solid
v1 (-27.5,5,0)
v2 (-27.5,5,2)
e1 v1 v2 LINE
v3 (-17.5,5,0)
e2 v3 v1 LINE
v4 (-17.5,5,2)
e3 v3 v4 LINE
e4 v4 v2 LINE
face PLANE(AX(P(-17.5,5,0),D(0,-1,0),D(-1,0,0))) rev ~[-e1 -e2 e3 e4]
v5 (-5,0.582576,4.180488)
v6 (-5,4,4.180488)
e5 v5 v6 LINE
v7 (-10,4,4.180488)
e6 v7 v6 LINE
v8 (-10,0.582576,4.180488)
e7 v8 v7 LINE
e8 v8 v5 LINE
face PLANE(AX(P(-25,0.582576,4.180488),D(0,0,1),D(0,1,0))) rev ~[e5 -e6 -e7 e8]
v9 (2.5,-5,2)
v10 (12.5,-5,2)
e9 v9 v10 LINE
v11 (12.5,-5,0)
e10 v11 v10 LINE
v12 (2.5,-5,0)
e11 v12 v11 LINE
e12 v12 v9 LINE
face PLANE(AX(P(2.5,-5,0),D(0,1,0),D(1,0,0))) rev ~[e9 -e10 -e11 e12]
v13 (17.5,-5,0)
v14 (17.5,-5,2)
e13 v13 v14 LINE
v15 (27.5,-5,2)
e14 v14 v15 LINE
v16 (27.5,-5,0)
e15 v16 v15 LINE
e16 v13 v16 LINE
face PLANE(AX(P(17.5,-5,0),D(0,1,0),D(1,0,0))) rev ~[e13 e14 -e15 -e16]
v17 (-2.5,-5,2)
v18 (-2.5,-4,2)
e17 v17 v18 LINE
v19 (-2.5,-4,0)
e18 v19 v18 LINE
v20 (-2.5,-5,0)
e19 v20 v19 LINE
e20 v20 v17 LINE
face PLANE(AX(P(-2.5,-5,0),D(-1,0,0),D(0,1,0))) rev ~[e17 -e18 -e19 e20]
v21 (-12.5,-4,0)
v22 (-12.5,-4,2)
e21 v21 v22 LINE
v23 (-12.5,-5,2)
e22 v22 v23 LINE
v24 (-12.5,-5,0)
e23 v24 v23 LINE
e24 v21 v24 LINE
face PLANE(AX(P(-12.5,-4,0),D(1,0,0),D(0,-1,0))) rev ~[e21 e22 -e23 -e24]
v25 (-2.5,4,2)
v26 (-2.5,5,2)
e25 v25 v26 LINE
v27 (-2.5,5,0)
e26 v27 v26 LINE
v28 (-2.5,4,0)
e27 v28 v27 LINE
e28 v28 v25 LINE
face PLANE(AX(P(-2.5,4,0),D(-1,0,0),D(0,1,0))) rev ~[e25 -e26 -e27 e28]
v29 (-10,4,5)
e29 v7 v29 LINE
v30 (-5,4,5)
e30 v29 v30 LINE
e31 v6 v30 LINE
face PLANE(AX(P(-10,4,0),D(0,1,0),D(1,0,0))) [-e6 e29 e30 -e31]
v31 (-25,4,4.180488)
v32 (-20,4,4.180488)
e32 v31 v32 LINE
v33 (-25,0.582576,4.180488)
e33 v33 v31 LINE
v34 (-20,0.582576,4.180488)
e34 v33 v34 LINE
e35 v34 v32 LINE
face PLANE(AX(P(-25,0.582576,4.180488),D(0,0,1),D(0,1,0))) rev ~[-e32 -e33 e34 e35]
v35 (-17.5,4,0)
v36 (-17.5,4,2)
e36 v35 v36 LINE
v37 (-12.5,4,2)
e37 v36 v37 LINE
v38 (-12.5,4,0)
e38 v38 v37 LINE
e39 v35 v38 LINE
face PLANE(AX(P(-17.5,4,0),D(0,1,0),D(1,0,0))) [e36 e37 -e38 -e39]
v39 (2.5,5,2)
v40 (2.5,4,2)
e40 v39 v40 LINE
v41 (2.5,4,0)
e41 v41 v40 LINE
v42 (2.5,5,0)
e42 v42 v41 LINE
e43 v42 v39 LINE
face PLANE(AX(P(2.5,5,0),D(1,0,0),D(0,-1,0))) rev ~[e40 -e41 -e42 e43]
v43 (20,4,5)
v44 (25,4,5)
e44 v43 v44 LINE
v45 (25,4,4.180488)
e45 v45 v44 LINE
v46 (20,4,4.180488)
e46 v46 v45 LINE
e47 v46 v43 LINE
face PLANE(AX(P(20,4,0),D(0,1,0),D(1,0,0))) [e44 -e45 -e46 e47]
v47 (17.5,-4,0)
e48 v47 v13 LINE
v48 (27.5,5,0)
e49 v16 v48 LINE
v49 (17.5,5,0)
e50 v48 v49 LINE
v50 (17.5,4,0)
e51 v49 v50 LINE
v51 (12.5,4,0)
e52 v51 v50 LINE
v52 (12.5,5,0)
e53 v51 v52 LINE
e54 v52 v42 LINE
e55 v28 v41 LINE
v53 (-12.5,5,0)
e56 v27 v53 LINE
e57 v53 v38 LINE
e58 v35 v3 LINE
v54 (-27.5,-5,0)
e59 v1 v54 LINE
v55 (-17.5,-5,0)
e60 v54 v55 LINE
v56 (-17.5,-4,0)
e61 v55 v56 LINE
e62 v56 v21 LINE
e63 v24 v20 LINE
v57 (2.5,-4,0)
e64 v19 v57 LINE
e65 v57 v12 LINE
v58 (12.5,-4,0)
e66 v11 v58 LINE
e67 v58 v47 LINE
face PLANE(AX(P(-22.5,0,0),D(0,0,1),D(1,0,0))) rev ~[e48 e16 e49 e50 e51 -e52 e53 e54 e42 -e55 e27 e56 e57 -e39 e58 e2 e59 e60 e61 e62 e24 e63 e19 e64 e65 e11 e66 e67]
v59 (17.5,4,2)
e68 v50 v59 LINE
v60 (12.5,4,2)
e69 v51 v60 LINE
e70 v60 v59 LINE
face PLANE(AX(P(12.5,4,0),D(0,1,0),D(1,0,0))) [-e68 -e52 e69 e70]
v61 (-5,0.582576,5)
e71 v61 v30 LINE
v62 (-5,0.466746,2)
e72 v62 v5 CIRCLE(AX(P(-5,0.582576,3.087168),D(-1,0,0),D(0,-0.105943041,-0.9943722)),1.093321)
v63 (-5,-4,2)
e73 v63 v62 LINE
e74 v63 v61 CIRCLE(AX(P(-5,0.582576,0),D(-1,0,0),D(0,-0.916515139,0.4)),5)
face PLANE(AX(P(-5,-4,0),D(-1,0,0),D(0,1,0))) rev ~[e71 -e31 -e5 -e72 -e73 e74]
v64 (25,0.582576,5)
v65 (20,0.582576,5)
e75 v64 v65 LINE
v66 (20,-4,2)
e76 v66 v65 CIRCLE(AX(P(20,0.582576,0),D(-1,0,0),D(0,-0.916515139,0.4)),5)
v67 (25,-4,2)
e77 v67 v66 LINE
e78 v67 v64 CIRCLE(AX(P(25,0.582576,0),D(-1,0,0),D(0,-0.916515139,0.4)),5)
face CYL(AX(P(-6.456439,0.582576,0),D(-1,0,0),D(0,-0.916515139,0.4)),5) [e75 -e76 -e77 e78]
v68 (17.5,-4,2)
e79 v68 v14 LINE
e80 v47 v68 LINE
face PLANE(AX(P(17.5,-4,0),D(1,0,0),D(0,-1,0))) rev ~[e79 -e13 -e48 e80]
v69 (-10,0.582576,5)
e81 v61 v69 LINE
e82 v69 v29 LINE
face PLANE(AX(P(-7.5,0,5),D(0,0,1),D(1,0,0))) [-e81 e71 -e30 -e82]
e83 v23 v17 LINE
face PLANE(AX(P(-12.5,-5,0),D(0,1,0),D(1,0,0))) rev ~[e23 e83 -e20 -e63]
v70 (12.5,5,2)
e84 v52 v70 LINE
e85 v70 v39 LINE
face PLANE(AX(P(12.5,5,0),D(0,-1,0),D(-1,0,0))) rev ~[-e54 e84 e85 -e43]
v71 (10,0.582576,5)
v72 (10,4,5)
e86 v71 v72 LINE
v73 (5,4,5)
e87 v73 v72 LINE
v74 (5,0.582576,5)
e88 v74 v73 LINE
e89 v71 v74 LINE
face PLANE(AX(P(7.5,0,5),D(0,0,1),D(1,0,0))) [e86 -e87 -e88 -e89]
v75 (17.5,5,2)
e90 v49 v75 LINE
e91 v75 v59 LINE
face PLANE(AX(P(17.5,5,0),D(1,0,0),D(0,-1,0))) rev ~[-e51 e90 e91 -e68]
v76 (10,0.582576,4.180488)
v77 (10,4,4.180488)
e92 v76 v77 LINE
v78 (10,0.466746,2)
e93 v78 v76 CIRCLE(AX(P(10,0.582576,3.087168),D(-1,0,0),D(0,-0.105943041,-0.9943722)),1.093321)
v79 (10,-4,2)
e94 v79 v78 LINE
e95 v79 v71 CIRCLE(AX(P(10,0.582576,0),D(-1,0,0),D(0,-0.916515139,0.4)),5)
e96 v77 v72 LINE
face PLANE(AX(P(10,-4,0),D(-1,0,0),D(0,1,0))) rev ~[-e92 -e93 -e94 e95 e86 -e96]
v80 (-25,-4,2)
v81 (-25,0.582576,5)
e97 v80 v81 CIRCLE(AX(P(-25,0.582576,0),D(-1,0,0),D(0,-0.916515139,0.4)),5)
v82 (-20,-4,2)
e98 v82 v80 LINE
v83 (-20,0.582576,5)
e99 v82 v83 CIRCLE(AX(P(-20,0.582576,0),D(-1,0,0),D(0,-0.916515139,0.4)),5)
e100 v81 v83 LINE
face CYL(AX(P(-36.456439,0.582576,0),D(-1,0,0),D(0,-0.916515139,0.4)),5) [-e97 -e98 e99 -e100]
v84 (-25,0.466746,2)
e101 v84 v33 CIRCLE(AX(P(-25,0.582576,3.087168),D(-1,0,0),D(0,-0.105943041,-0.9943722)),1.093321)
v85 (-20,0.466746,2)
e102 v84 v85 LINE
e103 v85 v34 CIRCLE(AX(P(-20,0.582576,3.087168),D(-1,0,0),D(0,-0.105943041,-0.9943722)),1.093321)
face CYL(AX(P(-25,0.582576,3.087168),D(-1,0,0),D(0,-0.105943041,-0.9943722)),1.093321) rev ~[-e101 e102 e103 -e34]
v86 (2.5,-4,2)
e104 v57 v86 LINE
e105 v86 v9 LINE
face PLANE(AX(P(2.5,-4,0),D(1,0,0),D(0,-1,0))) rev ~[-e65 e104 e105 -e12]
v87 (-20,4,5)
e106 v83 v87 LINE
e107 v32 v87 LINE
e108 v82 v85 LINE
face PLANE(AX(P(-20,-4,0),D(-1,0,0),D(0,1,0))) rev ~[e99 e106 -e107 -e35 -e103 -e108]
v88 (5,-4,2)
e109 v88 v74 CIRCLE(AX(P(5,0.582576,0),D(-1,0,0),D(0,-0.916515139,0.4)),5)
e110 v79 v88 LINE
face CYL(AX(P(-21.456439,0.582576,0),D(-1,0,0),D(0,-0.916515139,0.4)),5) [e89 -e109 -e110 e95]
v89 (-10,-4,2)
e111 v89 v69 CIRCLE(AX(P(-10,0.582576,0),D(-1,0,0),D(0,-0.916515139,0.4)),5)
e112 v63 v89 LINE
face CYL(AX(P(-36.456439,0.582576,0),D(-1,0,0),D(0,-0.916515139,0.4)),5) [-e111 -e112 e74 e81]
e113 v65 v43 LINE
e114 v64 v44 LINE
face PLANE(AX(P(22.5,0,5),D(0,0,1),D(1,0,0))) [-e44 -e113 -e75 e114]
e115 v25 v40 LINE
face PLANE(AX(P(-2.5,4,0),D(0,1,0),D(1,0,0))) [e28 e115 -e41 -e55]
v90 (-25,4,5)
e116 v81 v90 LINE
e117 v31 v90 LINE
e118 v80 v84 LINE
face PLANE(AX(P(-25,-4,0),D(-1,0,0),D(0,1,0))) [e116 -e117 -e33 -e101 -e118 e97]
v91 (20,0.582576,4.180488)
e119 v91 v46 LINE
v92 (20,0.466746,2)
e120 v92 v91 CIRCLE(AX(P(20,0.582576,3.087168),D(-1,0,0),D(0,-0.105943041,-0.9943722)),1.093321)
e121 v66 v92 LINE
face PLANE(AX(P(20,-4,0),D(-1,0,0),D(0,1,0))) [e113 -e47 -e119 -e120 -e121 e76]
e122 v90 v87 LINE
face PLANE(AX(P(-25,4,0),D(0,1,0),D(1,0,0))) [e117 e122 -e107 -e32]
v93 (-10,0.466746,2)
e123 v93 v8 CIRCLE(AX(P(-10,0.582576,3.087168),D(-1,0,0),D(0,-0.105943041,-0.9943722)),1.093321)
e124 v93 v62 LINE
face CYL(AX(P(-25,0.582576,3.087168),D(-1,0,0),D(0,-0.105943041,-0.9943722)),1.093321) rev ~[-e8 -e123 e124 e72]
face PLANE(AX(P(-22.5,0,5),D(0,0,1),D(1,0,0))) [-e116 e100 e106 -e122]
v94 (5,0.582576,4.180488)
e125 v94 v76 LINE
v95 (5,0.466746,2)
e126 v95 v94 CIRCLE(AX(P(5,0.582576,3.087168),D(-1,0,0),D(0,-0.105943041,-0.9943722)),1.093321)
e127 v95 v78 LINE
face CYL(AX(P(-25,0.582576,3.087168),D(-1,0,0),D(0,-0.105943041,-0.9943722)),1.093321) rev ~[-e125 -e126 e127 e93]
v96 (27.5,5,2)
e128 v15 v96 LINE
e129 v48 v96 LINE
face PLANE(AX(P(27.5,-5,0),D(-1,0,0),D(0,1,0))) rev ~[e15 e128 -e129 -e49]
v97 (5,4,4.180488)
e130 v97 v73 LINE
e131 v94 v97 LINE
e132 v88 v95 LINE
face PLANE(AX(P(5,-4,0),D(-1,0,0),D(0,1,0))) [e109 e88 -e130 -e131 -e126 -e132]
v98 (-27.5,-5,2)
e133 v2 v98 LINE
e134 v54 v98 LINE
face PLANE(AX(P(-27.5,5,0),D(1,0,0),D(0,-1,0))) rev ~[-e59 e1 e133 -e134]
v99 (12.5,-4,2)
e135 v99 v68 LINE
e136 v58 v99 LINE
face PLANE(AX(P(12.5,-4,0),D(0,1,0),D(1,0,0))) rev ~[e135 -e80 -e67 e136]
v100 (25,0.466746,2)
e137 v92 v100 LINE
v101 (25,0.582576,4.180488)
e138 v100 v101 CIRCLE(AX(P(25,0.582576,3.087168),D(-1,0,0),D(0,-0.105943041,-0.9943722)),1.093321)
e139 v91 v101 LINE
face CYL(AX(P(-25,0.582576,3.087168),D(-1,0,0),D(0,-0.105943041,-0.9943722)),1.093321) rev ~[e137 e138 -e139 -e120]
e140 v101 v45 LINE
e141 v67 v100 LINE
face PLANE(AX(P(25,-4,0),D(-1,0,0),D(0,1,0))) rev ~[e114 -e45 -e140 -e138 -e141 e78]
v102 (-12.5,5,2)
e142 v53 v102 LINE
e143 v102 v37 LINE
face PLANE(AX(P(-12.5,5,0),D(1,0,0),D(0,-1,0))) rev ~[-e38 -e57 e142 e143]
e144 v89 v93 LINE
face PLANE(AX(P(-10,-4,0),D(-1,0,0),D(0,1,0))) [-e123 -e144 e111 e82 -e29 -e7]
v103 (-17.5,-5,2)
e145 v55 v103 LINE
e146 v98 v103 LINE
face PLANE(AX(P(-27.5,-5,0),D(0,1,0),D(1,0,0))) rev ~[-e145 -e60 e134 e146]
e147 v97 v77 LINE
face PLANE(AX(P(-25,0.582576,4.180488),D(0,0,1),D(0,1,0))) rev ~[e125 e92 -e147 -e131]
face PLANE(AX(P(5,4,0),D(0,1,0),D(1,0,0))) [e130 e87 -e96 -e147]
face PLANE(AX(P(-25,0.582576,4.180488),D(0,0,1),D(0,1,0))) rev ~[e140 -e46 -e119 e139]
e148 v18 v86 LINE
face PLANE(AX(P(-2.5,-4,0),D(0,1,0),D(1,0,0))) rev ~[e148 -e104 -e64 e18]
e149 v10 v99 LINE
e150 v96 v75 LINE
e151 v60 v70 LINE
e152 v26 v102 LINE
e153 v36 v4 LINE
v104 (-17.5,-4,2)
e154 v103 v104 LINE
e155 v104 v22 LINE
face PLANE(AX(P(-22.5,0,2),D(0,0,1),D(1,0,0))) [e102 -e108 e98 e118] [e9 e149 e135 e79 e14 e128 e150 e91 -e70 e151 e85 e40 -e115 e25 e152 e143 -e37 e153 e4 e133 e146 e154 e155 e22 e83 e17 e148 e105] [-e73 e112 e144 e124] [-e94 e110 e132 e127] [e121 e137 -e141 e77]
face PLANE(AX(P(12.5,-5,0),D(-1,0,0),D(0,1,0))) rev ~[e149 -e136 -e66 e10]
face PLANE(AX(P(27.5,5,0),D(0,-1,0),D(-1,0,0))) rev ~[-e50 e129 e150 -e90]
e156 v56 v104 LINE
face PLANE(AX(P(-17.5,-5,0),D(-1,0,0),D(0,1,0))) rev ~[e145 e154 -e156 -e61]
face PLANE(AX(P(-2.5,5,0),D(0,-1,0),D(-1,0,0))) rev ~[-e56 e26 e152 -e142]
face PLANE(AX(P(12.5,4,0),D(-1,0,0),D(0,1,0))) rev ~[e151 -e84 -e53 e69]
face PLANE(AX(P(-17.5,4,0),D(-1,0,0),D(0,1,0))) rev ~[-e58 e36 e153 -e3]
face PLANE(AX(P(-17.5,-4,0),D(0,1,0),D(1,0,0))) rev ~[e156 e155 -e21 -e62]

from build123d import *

# Parameters (mm, degrees)
F0_W        = 5
F0_H        = 8
F1_DEPTH    = 2
F2_DEPTH    = 5
F3_T1_DEPTH = 27.9128784748
F3_T3_DEPTH = 27.9128784748
F3_T5_DEPTH = 27.9128784748
F3_T7_DEPTH = 27.9128784748
F5_DEPTH    = 65


# Not quite as in the source:
# - a fillet or chamfer that OpenCascade refuses, or shapes differently, is made with other operations: its cross-section is extruded or revolved along the edge and cut away or added


with BuildPart() as f1:
    # F0 (on Top) → F1 (new body)
    with BuildSketch(Plane.XY):
        Polygon((-17.5, 5), (-27.5, 5), (-27.5, -5), (-17.5, -5), (-17.5, -4), (-17.5, 4), align=None)
        with Locations((-22.5, 0)):
            Rectangle(F0_W, F0_H, mode=Mode.SUBTRACT)
        with Locations((-15, 0)):
            Rectangle(F0_W, F0_H)
        Polygon((-12.5, 5), (-12.5, 4), (-12.5, -4), (-12.5, -5), (-2.5, -5), (-2.5, -4), (-2.5, 4), (-2.5, 5), align=None)
        with Locations((-7.5, 0)):
            Rectangle(F0_W, F0_H, mode=Mode.SUBTRACT)
        Rectangle(F0_W, F0_H)
        Polygon((2.5, 5), (2.5, 4), (2.5, -4), (2.5, -5), (12.5, -5), (12.5, -4), (12.5, 4), (12.5, 5), align=None)
        with Locations((7.5, 0)):
            Rectangle(F0_W, F0_H, mode=Mode.SUBTRACT)
        with Locations((15, 0)):
            Rectangle(F0_W, F0_H)
        Polygon((17.5, 5), (17.5, 4), (17.5, -4), (17.5, -5), (27.5, -5), (27.5, 5), align=None)
        with Locations((22.5, 0)):
            Rectangle(F0_W, F0_H, mode=Mode.SUBTRACT)
    extrude(amount=F1_DEPTH)

    # F0 (on Top) → F2 (join)
    with BuildSketch(Plane.XY):
        with Locations((-22.5, 0)):
            Rectangle(F0_W, F0_H)
        with Locations((-7.5, 0)):
            Rectangle(F0_W, F0_H)
        with Locations((7.5, 0)):
            Rectangle(F0_W, F0_H)
        with Locations((22.5, 0)):
            Rectangle(F0_W, F0_H)
    extrude(amount=F2_DEPTH)

    # F3: fillet of radius 5 on 4 edges, made by hand

    # F3_s2 → F3_t1 (cut)
    with BuildSketch(Plane.YZ.offset(-36.4564392374)):
        with BuildLine():
            ThreePointArc((-4, 2), (-2.1560370926, 4.1833001327), (0.582575695, 5))
            Line((0.582575695, 5), (0.582575695, 5.1))
            Line((0.582575695, 5.1), (-4, 5.1))
            Line((-4, 5.1), (-4.1, 5))
            ThreePointArc((-4.1, 5), (-4.1, 3.5), (-4.0916515139, 2.04))
            Line((-4.0916515139, 2.04), (-4, 2))
        make_face()
    extrude(amount=F3_T1_DEPTH, mode=Mode.SUBTRACT)

    # F3_s4 → F3_t3 (cut)
    with BuildSketch(Plane.YZ.offset(-21.4564392374)):
        with BuildLine():
            ThreePointArc((-4, 2), (-2.1560370926, 4.1833001327), (0.582575695, 5))
            Line((0.582575695, 5), (0.582575695, 5.1))
            Line((0.582575695, 5.1), (-4, 5.1))
            Line((-4, 5.1), (-4.1, 5))
            ThreePointArc((-4.1, 5), (-4.1, 3.5), (-4.0916515139, 2.04))
            Line((-4.0916515139, 2.04), (-4, 2))
        make_face()
    extrude(amount=F3_T3_DEPTH, mode=Mode.SUBTRACT)

    # F3_s6 → F3_t5 (cut)
    with BuildSketch(Plane.YZ.offset(-6.4564392374)):
        with BuildLine():
            ThreePointArc((-4, 2), (-2.1560370926, 4.1833001327), (0.582575695, 5))
            Line((0.582575695, 5), (0.582575695, 5.1))
            Line((0.582575695, 5.1), (-4, 5.1))
            Line((-4, 5.1), (-4.1, 5))
            ThreePointArc((-4.1, 5), (-4.1, 3.5), (-4.0916515139, 2.04))
            Line((-4.0916515139, 2.04), (-4, 2))
        make_face()
    extrude(amount=F3_T5_DEPTH, mode=Mode.SUBTRACT)

    # F3_s8 → F3_t7 (cut)
    with BuildSketch(Plane.YZ.offset(8.5435607626)):
        with BuildLine():
            ThreePointArc((-4, 2), (-2.1560370926, 4.1833001327), (0.582575695, 5))
            Line((0.582575695, 5), (0.582575695, 5.1))
            Line((0.582575695, 5.1), (-4, 5.1))
            Line((-4, 5.1), (-4.1, 5))
            ThreePointArc((-4.1, 5), (-4.1, 3.5), (-4.0916515139, 2.04))
            Line((-4.0916515139, 2.04), (-4, 2))
        make_face()
    extrude(amount=F3_T7_DEPTH, mode=Mode.SUBTRACT)

    # F4 (on face) → F5 (cut)
    with BuildSketch(Plane(origin=(-25, 0, 0), x_dir=(0, -1, 0), z_dir=(-1, 0, 0))):
        with BuildLine():
            Line((-0.582575695, 4.1804881766), (-4, 4.1804881766))
            Line((-4, 4.1804881766), (-4, 2))
            Line((-4, 2), (-0.4667459871, 2))
            ThreePointArc((-0.4667459871, 2), (0.5092055571, 3.1451641031), (-0.582575695, 4.1804881766))
        make_face()
    extrude(amount=-F5_DEPTH, mode=Mode.SUBTRACT)


solid = f1.part
